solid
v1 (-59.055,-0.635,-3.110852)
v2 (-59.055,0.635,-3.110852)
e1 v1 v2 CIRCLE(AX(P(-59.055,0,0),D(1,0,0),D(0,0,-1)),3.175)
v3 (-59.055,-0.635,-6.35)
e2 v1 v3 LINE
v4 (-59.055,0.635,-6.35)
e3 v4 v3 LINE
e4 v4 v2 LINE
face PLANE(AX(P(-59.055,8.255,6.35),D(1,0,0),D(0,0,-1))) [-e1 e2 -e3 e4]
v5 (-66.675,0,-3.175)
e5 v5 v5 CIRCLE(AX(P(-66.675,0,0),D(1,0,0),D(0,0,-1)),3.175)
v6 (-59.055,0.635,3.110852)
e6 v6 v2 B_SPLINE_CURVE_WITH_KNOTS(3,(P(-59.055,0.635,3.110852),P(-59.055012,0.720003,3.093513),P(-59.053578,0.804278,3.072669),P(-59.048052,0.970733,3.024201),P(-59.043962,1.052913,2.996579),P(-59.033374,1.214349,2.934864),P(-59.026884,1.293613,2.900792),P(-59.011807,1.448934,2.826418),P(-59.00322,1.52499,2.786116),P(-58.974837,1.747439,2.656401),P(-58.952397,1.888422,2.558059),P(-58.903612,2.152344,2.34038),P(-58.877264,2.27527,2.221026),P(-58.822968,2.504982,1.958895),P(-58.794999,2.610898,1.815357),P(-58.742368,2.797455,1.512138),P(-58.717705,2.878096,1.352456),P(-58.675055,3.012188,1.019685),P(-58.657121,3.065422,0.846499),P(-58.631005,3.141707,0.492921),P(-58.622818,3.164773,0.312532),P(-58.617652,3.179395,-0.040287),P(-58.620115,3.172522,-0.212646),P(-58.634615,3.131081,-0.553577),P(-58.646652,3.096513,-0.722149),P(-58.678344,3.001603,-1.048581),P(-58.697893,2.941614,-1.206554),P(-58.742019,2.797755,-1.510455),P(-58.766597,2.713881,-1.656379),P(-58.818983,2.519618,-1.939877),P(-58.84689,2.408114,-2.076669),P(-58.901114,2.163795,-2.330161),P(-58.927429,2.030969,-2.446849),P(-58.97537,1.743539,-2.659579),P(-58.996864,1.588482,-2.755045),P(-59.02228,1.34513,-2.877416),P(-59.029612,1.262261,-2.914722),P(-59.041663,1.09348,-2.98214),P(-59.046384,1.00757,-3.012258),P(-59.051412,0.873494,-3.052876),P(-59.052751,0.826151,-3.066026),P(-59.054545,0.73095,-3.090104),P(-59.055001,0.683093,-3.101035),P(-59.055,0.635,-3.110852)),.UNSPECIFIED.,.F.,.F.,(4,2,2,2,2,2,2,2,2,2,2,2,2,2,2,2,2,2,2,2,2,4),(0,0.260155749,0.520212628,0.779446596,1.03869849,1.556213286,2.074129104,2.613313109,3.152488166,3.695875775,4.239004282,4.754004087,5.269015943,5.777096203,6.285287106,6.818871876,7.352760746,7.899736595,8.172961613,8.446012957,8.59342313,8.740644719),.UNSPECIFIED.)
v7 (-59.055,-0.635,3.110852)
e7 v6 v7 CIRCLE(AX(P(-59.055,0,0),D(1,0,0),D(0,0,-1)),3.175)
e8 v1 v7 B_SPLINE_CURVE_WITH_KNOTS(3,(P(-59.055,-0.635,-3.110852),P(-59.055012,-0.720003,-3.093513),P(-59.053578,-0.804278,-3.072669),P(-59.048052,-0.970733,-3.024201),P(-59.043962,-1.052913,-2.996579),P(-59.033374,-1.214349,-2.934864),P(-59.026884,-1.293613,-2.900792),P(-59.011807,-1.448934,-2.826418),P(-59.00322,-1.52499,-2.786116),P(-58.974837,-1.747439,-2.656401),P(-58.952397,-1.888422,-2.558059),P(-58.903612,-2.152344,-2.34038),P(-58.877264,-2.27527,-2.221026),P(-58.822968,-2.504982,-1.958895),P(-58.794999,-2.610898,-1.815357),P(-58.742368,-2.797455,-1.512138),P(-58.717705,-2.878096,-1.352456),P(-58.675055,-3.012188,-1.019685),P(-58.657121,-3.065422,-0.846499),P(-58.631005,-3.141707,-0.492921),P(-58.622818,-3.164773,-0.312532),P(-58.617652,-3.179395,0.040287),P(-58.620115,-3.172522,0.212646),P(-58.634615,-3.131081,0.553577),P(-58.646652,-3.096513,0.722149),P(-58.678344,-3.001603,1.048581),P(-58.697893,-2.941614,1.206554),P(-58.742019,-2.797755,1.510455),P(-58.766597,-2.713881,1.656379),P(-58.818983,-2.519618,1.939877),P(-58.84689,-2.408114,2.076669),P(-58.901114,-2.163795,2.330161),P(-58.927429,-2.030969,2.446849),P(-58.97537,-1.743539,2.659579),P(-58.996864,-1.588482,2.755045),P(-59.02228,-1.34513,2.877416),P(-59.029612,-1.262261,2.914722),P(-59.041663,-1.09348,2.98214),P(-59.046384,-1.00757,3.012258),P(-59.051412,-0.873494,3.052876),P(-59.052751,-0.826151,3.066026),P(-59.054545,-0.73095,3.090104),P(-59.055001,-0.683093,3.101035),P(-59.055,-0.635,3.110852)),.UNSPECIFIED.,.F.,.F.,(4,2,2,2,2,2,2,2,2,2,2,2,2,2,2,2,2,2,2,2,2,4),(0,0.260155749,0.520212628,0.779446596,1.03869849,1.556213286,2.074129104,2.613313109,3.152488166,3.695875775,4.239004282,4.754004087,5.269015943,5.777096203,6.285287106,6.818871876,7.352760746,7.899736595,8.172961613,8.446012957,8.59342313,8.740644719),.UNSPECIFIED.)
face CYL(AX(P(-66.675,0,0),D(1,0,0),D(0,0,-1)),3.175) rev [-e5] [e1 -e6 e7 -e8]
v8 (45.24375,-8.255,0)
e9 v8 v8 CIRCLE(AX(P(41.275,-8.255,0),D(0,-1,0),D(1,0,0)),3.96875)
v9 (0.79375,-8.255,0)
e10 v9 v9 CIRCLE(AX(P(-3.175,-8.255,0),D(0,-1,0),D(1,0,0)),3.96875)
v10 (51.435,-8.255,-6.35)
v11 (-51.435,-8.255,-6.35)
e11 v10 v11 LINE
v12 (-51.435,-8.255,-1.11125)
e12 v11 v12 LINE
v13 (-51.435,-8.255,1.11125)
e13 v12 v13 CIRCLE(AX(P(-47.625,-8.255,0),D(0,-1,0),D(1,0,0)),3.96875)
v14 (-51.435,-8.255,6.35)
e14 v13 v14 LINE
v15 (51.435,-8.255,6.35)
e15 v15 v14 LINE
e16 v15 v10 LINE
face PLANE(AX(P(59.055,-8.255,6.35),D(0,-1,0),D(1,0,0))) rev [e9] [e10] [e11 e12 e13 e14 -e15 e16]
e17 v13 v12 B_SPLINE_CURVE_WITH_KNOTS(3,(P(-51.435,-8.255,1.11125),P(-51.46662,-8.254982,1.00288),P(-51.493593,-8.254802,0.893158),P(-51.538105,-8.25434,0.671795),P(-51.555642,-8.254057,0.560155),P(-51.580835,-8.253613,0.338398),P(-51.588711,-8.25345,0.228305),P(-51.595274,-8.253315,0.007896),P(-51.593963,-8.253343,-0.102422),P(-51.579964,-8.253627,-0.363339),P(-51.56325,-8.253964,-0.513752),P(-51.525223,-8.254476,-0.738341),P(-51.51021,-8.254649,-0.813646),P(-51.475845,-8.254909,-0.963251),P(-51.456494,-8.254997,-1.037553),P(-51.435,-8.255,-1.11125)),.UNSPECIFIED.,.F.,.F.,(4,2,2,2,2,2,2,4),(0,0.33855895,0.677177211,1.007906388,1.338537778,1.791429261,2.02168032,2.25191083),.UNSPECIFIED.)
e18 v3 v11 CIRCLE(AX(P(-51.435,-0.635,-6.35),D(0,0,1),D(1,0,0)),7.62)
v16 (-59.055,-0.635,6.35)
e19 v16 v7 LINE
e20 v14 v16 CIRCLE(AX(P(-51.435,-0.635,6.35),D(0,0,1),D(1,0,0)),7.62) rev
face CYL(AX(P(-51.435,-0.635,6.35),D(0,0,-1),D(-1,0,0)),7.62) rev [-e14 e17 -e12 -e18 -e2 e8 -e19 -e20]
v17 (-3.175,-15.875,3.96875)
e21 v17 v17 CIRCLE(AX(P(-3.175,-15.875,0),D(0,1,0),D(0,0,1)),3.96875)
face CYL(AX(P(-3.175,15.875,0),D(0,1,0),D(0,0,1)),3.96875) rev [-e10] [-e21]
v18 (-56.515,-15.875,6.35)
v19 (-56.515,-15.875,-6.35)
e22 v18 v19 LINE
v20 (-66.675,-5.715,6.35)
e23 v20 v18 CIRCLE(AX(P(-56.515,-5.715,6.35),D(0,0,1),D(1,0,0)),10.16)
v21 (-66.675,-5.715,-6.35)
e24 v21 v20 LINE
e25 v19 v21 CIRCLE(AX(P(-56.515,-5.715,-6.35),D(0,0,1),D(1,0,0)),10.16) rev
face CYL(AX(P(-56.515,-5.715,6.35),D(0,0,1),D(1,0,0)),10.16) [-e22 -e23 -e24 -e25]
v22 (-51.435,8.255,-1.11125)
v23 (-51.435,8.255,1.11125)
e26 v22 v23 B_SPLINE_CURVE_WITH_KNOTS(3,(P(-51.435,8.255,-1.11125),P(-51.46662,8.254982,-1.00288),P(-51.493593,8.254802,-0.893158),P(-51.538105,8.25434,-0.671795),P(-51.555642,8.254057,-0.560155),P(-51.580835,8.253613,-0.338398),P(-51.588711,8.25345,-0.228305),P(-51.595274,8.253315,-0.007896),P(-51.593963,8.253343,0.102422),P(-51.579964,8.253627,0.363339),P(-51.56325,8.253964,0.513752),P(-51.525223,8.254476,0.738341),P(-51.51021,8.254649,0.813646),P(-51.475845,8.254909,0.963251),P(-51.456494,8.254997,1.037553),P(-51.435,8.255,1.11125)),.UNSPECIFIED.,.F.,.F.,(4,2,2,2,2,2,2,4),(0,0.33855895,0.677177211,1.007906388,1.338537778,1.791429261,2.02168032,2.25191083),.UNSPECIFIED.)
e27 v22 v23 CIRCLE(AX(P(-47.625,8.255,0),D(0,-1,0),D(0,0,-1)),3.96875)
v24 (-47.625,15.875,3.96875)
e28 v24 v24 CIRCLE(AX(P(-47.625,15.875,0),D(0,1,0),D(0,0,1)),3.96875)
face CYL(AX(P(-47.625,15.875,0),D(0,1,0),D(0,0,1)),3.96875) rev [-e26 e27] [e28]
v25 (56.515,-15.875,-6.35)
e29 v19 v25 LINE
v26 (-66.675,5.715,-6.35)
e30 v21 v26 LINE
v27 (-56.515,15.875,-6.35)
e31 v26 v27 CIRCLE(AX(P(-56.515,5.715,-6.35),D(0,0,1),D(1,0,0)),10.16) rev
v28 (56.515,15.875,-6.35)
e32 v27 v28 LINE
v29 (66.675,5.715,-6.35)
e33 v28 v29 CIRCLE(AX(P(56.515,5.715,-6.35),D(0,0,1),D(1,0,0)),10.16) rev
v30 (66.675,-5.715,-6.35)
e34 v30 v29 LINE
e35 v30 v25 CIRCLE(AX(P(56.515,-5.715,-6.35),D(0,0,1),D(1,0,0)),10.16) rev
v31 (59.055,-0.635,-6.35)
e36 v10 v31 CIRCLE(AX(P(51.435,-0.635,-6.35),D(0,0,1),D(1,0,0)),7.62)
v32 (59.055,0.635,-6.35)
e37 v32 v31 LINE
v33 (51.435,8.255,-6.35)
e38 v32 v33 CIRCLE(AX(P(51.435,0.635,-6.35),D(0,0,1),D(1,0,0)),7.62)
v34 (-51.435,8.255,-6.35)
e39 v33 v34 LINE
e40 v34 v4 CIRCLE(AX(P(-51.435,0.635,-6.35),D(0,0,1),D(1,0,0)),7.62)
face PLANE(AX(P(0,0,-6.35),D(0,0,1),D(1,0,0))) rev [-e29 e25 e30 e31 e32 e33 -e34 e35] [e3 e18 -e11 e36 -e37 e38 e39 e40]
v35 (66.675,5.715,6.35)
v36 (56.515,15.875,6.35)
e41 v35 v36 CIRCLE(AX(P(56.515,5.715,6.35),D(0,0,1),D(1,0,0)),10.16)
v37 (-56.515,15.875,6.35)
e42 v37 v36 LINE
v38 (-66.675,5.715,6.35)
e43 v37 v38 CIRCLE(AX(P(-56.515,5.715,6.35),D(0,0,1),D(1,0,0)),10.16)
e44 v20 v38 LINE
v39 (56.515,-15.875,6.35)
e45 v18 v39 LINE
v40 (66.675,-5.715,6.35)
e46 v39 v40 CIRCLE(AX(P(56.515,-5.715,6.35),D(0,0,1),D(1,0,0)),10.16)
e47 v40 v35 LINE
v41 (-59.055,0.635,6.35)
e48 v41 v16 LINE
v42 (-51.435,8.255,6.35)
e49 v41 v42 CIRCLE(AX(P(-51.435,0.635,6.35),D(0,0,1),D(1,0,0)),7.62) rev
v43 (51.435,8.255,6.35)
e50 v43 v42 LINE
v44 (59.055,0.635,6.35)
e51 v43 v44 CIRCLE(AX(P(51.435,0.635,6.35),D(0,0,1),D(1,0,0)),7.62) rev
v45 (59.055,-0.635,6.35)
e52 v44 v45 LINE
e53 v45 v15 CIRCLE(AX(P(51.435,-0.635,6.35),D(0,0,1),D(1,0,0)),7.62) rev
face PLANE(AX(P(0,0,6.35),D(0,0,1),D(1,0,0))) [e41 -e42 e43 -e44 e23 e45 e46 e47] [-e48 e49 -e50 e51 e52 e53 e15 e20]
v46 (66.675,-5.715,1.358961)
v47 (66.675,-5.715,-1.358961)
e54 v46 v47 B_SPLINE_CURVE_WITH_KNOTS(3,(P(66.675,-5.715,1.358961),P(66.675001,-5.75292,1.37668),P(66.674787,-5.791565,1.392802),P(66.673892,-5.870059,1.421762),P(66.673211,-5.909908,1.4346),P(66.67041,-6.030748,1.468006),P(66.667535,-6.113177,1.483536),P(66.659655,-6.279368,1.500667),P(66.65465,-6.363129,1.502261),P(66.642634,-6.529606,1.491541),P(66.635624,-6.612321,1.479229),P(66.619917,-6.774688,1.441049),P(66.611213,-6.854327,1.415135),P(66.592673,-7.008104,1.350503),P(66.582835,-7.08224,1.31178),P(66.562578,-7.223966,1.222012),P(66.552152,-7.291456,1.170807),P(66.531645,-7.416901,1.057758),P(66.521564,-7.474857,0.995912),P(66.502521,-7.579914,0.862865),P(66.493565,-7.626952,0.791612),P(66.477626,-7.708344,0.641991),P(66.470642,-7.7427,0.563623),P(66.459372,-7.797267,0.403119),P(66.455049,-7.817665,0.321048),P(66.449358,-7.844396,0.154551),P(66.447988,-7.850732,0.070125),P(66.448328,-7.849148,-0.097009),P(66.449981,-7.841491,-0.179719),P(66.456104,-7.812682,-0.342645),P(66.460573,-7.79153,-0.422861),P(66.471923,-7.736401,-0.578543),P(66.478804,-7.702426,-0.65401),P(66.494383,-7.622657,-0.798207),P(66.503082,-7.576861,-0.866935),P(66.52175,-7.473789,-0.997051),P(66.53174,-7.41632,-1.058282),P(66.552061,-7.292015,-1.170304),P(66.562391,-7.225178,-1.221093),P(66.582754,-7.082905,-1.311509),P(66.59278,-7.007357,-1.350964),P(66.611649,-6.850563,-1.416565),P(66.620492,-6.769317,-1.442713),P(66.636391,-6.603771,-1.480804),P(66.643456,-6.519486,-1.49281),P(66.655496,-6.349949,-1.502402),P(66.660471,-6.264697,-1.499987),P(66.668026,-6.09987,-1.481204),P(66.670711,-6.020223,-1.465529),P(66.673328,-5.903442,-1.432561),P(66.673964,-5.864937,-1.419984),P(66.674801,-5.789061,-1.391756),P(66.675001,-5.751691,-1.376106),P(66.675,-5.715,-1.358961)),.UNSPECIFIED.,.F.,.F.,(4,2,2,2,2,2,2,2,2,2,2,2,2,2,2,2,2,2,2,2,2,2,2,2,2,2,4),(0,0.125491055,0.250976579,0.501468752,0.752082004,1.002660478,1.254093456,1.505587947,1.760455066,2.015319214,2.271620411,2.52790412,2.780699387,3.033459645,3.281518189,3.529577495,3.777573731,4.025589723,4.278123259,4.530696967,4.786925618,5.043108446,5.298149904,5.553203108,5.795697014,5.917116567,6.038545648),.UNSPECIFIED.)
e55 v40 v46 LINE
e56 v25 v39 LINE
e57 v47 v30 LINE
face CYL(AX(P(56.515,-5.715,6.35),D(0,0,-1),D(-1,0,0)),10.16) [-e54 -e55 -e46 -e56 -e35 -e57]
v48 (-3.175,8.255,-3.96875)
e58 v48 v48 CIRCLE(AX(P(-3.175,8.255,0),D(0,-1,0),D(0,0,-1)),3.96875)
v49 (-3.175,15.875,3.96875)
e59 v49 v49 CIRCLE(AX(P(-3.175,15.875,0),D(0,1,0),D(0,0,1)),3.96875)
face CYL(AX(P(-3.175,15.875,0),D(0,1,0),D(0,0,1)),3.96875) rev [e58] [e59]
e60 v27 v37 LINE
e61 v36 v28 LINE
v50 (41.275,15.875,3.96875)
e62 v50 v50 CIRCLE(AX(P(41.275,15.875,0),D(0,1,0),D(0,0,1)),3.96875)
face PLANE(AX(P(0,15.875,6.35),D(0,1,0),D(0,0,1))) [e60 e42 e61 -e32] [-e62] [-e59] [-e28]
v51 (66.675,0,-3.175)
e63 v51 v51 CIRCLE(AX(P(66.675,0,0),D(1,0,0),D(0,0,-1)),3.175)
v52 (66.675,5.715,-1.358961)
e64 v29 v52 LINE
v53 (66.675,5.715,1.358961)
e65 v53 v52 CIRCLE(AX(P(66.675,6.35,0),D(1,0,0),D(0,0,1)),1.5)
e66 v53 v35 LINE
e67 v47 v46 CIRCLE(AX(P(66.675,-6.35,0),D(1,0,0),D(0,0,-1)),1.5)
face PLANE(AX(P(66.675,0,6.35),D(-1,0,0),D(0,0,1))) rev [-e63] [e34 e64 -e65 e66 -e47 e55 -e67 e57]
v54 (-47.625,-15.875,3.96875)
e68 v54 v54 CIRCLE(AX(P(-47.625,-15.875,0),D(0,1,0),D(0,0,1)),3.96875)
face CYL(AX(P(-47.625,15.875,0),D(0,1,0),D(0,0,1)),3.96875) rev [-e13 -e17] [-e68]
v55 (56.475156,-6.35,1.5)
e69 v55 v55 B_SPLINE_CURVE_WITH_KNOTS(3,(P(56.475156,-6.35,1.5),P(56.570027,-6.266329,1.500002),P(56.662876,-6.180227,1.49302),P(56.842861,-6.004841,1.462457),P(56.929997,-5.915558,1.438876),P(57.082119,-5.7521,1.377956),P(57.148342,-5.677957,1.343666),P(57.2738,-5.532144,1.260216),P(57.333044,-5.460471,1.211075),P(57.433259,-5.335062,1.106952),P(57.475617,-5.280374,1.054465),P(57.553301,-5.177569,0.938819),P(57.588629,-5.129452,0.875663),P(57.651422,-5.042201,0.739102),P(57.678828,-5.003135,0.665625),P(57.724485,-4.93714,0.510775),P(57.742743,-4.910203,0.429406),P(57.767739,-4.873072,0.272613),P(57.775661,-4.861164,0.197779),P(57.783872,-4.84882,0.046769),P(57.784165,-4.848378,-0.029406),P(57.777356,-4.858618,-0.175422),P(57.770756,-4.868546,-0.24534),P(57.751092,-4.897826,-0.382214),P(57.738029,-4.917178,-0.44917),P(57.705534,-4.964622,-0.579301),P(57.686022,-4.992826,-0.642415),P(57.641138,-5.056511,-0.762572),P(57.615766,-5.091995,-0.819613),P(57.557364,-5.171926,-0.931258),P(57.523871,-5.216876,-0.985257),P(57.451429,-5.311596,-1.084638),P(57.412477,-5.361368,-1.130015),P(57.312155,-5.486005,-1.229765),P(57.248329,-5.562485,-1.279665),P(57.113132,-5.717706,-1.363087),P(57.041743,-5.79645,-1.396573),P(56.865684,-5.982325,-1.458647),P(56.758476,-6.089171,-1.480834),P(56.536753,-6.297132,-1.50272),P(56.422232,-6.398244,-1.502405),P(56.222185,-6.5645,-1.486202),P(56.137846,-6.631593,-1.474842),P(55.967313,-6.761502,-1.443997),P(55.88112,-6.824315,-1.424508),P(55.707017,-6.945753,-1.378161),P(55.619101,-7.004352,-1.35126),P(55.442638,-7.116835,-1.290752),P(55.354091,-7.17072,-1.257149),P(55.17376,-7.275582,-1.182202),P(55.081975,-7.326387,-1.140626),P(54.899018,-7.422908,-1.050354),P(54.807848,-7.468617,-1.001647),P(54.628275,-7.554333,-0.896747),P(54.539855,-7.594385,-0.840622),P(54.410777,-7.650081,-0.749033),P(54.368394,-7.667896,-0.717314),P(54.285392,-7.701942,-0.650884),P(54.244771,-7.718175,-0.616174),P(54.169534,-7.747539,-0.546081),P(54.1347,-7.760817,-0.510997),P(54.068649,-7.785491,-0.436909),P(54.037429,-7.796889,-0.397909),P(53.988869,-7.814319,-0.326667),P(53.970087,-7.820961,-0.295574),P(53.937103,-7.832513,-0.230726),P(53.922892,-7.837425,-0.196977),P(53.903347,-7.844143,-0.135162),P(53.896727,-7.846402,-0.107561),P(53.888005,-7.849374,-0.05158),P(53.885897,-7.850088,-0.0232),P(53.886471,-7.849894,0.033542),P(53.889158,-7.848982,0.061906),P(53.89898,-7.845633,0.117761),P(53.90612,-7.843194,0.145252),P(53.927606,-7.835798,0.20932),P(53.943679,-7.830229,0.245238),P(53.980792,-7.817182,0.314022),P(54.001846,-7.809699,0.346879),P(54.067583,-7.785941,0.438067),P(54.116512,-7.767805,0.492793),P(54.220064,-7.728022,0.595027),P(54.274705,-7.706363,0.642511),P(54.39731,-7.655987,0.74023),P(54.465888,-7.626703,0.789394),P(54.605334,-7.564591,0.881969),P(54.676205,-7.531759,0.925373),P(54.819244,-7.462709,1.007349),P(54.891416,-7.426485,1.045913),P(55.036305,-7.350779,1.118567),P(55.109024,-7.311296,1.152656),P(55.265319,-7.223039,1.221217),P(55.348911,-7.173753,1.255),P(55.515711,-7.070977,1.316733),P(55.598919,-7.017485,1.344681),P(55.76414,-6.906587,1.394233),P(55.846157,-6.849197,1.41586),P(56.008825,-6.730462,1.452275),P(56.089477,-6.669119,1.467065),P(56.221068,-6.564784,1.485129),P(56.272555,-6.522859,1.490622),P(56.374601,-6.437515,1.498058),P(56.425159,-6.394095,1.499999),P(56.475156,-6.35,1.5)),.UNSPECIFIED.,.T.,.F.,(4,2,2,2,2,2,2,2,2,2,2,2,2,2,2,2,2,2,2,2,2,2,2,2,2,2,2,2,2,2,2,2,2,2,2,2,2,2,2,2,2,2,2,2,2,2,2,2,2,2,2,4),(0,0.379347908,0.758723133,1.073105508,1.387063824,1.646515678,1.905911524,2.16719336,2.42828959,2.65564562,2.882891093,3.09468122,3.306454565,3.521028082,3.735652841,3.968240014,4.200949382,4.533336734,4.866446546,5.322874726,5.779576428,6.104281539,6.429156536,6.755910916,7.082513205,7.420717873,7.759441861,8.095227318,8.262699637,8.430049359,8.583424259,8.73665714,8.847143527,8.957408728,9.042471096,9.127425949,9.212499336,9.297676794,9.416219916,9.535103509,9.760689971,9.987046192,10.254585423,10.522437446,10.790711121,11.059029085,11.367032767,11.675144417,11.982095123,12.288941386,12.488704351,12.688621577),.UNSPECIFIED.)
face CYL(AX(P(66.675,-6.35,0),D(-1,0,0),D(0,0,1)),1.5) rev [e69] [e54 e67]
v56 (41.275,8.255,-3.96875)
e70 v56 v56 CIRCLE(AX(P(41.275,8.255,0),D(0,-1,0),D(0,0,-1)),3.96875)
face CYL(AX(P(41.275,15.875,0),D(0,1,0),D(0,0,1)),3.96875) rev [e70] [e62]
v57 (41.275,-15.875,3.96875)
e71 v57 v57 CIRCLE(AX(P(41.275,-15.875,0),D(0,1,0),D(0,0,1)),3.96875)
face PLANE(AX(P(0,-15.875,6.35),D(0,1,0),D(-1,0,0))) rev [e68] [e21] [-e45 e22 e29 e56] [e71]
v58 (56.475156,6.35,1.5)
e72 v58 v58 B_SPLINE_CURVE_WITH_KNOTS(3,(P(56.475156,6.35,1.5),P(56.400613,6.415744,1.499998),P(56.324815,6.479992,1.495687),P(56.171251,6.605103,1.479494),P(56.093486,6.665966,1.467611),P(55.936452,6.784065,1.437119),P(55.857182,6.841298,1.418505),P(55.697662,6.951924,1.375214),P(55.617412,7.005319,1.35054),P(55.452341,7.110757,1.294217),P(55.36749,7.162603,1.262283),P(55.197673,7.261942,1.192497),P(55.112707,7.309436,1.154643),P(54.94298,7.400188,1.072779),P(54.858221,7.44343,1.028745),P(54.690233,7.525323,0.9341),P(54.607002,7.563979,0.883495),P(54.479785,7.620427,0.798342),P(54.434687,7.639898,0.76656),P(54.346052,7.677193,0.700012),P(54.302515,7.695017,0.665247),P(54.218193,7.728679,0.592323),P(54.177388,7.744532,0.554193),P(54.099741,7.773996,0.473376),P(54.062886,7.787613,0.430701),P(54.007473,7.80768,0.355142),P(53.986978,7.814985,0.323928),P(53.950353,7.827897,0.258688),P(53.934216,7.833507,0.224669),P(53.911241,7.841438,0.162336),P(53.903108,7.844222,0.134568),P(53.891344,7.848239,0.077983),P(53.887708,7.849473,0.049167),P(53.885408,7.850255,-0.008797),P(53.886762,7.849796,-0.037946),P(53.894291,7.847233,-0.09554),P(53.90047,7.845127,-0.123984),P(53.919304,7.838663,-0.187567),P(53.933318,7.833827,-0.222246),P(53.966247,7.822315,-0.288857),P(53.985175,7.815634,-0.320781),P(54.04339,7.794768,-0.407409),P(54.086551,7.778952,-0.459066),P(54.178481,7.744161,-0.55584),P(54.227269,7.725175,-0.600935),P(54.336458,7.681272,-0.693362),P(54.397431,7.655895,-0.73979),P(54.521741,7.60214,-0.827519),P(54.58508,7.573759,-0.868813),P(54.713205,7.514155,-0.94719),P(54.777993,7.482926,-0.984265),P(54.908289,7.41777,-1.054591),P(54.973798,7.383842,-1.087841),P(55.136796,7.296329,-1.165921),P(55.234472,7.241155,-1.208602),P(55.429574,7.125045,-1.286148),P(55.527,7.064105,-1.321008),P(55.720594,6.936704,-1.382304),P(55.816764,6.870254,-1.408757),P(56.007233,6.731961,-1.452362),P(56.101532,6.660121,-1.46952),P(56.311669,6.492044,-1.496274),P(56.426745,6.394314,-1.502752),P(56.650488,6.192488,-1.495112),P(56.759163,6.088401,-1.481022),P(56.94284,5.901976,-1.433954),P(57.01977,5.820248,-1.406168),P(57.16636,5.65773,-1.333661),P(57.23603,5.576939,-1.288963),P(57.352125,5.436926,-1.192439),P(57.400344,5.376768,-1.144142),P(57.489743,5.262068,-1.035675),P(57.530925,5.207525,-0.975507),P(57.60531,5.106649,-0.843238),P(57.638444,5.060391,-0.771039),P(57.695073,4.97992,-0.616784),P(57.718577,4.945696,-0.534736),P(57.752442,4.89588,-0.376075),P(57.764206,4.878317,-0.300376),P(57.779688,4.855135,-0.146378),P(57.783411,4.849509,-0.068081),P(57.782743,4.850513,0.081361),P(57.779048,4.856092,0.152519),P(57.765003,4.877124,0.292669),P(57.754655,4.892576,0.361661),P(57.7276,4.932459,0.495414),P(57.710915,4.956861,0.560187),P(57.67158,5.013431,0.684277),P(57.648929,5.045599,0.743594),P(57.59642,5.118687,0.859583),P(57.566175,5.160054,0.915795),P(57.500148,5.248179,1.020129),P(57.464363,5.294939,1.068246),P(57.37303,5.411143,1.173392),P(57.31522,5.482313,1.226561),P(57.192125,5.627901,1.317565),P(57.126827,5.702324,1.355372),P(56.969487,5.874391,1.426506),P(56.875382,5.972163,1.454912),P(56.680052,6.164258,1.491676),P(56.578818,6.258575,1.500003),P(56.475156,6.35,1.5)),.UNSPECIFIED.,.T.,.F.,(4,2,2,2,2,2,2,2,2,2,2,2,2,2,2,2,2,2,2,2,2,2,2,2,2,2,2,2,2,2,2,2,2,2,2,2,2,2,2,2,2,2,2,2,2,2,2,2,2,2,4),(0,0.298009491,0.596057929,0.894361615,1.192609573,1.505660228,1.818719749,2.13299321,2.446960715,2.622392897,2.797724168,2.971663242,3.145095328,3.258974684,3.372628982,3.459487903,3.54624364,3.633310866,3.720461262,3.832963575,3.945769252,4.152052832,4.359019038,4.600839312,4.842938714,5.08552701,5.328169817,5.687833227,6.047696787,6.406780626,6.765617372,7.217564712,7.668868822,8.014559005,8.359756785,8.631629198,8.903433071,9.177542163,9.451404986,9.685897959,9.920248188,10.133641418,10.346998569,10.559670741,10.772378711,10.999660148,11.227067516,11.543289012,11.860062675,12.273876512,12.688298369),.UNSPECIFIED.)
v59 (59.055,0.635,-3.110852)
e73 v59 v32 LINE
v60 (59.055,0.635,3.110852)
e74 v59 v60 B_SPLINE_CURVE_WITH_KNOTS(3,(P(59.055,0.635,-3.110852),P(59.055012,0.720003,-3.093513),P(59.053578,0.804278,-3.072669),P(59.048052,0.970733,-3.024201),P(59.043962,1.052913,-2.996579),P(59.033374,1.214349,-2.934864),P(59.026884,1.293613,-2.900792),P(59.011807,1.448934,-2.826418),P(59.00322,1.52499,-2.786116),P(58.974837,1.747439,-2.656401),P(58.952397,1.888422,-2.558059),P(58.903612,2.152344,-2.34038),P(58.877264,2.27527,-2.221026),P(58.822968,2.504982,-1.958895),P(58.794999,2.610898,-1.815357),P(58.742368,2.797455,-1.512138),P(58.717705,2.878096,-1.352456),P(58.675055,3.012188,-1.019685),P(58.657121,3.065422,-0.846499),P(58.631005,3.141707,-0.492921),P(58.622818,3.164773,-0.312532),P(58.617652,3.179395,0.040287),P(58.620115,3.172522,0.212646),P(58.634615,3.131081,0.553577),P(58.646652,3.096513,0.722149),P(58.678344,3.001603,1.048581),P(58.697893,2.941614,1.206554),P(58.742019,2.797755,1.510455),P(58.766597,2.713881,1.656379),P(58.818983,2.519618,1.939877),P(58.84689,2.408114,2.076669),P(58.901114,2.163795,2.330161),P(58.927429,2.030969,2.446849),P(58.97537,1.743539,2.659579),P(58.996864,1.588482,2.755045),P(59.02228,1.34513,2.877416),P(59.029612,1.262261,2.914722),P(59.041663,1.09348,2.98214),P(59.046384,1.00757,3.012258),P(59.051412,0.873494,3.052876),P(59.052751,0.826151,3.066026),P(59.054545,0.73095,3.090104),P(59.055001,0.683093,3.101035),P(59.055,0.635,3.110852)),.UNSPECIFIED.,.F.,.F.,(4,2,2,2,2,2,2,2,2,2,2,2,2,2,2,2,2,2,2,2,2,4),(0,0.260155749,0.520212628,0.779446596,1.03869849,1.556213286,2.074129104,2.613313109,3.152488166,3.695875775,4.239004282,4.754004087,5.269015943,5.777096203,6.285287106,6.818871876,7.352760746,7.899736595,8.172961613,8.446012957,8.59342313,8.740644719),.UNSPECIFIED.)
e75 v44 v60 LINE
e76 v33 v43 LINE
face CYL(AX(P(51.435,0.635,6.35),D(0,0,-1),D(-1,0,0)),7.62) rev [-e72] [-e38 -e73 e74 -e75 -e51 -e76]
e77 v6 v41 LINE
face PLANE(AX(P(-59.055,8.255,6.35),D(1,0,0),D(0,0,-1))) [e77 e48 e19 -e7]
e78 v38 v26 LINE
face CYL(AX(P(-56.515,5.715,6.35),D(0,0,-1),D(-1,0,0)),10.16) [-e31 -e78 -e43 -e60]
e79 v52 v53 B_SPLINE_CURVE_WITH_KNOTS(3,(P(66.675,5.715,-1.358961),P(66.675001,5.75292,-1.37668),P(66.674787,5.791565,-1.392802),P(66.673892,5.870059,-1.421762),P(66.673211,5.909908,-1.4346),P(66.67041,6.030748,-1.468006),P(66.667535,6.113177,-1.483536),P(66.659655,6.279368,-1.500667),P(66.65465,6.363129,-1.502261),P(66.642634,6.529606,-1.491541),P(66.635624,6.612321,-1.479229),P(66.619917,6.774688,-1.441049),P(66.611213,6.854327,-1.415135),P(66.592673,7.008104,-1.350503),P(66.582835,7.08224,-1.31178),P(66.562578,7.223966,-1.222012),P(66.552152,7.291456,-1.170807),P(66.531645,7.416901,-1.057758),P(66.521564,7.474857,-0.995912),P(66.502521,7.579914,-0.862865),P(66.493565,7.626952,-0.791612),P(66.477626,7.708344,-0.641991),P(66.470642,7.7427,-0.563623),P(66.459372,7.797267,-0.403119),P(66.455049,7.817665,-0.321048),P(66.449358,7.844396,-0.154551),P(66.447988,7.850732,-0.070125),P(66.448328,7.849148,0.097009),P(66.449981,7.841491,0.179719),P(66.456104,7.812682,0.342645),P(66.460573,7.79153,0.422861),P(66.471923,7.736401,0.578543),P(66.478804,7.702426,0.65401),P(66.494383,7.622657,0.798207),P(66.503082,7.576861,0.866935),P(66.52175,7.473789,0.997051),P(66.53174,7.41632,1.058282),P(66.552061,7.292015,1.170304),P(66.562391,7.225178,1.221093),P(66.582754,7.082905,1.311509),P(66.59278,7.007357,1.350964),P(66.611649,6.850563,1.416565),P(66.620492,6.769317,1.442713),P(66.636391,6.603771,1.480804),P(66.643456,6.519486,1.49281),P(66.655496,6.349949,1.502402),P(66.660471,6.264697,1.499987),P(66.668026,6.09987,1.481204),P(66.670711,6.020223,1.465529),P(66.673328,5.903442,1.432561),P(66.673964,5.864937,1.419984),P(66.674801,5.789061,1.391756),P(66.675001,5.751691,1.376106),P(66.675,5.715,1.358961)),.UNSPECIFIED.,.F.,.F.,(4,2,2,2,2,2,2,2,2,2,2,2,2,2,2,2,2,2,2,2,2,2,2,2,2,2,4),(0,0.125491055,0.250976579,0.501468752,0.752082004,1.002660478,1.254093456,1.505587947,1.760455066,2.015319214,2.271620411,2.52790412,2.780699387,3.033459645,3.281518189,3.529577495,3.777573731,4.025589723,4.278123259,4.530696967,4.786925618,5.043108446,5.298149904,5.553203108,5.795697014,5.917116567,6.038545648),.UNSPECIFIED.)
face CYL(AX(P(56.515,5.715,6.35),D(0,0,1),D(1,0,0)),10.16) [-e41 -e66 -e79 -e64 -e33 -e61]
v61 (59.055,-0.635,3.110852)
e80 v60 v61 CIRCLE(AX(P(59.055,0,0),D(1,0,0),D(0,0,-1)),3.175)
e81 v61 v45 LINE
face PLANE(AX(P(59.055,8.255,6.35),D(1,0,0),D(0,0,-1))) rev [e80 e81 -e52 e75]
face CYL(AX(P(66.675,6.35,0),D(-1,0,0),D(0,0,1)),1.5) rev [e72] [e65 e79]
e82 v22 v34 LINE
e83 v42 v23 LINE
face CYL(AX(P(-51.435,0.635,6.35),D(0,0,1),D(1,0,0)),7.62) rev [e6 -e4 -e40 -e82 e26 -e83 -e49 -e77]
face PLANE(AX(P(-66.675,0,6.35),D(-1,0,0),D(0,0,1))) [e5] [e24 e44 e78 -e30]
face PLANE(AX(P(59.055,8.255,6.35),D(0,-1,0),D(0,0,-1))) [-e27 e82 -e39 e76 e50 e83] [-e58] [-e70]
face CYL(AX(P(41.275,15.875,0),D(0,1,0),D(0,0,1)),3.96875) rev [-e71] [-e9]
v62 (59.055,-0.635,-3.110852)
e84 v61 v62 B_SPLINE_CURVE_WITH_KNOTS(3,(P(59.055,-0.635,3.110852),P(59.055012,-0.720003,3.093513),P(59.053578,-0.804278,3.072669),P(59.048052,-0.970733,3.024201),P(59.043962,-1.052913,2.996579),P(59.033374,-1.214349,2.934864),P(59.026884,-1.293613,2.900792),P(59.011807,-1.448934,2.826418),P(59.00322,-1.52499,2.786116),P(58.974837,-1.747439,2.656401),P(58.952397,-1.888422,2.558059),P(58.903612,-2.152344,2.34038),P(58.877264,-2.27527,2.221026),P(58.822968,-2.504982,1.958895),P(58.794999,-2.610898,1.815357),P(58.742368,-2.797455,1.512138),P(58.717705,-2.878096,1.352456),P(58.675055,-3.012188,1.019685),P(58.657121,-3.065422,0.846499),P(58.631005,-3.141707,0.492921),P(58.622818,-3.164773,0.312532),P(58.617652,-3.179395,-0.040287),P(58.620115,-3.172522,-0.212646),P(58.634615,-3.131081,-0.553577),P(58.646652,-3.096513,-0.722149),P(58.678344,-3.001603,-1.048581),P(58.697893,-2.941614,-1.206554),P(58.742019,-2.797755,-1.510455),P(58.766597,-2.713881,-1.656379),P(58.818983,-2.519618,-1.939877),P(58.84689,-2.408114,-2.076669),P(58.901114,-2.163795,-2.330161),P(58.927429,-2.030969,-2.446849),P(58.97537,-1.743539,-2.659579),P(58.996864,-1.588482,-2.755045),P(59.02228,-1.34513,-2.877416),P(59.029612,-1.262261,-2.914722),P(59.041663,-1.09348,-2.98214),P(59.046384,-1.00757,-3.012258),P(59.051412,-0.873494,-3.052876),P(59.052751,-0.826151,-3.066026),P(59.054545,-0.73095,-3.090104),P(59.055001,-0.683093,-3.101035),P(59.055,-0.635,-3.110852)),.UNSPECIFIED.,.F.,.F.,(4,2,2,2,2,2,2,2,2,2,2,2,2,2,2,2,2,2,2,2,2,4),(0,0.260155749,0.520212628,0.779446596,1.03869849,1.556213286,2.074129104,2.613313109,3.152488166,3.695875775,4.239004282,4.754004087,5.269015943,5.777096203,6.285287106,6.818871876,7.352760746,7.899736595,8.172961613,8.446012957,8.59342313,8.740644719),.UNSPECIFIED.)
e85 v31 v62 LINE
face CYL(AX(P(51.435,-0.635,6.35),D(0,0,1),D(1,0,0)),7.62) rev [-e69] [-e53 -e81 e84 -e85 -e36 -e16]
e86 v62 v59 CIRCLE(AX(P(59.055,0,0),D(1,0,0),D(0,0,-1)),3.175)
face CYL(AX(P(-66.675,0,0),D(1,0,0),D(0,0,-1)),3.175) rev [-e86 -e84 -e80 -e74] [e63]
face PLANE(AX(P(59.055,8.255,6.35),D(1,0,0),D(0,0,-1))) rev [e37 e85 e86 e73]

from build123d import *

# Parameters (mm, degrees)
SKETCH1_W               = 133.35
SKETCH1_H               = 31.75
SKETCH1_W_2             = 118.11
SKETCH1_H_2             = 16.51
BOSS_EXTRUDE1_DEPTH     = 6.35
FILLET2_R               = 7.62
CUT_EXTRUDE1_DEPTH      = 69.832359759
CUT_EXTRUDE1_DEPTH_BACK = 69.832359759
SKETCH2_R               = 3.175
F_3_8_16_TAPPED_HOLE1_D = 7.9375
SKETCH5_R               = 1.5
CUT_EXTRUDE2_DEPTH      = 69.832359888
FILLET3_R               = 10.16
FILLET4_R               = 10.16
FILLET5_R               = 10.16
FILLET6_R               = 10.16


with BuildPart() as part:
    # Sketch1 → Boss-Extrude1 (new, symmetric)
    with BuildSketch(Plane.XY):
        Rectangle(SKETCH1_W, SKETCH1_H)
        Rectangle(SKETCH1_W_2, SKETCH1_H_2, mode=Mode.SUBTRACT)
    extrude(amount=BOSS_EXTRUDE1_DEPTH, both=True)

    # Fillet2
    fillet2_edges = [part.edges().sort_by_distance(p)[0] for p in [
        (59.055, -8.255, 0),
        (59.055, 8.255, 0),
        (-59.055, 8.255, 0),
        (-59.055, -8.255, 0),
    ]]
    fillet(fillet2_edges, radius=FILLET2_R)

    # Sketch2 → Cut-Extrude1 (cut, two sides: drawn at the far end of the back side and taken through both)
    with BuildSketch(Plane(origin=(0, 0, 0), x_dir=(0, 0, -1), z_dir=(1, 0, 0)).offset(-CUT_EXTRUDE1_DEPTH_BACK)):
        Circle(SKETCH2_R)
    extrude(amount=CUT_EXTRUDE1_DEPTH + CUT_EXTRUDE1_DEPTH_BACK, mode=Mode.SUBTRACT)

    # 3/8-16 Tapped Hole1 (through all)
    with Locations(Plane(origin=(0, 15.875, 0), x_dir=(1, 0, 0), z_dir=(0, 1, 0))):
        with Locations((-47.625, 0), (-3.175, 0), (41.275, 0)):
            Hole(F_3_8_16_TAPPED_HOLE1_D / 2)

    # Sketch5 → Cut-Extrude2 (cut, through all)
    with BuildSketch(Plane(origin=(0, 0, 0), x_dir=(0, 0, -1), z_dir=(1, 0, 0))):
        with Locations(Location((0, -6.35, 0), (0, 0, 180))):
            Circle(SKETCH5_R)
        with Locations(Location((0, 6.35, 0), (0, 0, 180))):
            Circle(SKETCH5_R)
    extrude(amount=CUT_EXTRUDE2_DEPTH, mode=Mode.SUBTRACT)

    # Fillet3
    fillet3_edges = [part.edges().sort_by_distance(p)[0] for p in [
        (-66.675, 15.875, 0),
    ]]
    fillet(fillet3_edges, radius=FILLET3_R)

    # Fillet4
    fillet4_edges = [part.edges().sort_by_distance(p)[0] for p in [
        (-66.675, -15.875, 0),
    ]]
    fillet(fillet4_edges, radius=FILLET4_R)

    # Fillet5
    # the kernel refuses this fillet: 10.16 mm, written as the material it takes off along each edge
    with BuildSketch(Plane(origin=(66.675, -15.875, -31.75), x_dir=(-1, 0, 0), z_dir=(0, 0, 1))) as fillet5_piece_1:
        with BuildLine():
            CenterArc((FILLET5_R, -FILLET5_R), FILLET5_R, 90, 90)
            Line((0, -FILLET5_R), (0, 0))
            Line((0, 0), (FILLET5_R, 0))
        make_face()
    extrude(amount=63.5, mode=Mode.SUBTRACT)

    # Fillet6
    # the kernel refuses this fillet: 10.16 mm, written as the material it takes off along each edge
    with BuildSketch(Plane(origin=(66.675, 15.875, 31.75), x_dir=(0, -1, 0), z_dir=(0, 0, -1))) as fillet6_piece_1:
        with BuildLine():
            CenterArc((FILLET6_R, FILLET6_R), FILLET6_R, 180, 90)
            Line((0, FILLET6_R), (0, 0))
            Line((0, 0), (FILLET6_R, 0))
        make_face()
    extrude(amount=63.5, mode=Mode.SUBTRACT)


solid = part.part
